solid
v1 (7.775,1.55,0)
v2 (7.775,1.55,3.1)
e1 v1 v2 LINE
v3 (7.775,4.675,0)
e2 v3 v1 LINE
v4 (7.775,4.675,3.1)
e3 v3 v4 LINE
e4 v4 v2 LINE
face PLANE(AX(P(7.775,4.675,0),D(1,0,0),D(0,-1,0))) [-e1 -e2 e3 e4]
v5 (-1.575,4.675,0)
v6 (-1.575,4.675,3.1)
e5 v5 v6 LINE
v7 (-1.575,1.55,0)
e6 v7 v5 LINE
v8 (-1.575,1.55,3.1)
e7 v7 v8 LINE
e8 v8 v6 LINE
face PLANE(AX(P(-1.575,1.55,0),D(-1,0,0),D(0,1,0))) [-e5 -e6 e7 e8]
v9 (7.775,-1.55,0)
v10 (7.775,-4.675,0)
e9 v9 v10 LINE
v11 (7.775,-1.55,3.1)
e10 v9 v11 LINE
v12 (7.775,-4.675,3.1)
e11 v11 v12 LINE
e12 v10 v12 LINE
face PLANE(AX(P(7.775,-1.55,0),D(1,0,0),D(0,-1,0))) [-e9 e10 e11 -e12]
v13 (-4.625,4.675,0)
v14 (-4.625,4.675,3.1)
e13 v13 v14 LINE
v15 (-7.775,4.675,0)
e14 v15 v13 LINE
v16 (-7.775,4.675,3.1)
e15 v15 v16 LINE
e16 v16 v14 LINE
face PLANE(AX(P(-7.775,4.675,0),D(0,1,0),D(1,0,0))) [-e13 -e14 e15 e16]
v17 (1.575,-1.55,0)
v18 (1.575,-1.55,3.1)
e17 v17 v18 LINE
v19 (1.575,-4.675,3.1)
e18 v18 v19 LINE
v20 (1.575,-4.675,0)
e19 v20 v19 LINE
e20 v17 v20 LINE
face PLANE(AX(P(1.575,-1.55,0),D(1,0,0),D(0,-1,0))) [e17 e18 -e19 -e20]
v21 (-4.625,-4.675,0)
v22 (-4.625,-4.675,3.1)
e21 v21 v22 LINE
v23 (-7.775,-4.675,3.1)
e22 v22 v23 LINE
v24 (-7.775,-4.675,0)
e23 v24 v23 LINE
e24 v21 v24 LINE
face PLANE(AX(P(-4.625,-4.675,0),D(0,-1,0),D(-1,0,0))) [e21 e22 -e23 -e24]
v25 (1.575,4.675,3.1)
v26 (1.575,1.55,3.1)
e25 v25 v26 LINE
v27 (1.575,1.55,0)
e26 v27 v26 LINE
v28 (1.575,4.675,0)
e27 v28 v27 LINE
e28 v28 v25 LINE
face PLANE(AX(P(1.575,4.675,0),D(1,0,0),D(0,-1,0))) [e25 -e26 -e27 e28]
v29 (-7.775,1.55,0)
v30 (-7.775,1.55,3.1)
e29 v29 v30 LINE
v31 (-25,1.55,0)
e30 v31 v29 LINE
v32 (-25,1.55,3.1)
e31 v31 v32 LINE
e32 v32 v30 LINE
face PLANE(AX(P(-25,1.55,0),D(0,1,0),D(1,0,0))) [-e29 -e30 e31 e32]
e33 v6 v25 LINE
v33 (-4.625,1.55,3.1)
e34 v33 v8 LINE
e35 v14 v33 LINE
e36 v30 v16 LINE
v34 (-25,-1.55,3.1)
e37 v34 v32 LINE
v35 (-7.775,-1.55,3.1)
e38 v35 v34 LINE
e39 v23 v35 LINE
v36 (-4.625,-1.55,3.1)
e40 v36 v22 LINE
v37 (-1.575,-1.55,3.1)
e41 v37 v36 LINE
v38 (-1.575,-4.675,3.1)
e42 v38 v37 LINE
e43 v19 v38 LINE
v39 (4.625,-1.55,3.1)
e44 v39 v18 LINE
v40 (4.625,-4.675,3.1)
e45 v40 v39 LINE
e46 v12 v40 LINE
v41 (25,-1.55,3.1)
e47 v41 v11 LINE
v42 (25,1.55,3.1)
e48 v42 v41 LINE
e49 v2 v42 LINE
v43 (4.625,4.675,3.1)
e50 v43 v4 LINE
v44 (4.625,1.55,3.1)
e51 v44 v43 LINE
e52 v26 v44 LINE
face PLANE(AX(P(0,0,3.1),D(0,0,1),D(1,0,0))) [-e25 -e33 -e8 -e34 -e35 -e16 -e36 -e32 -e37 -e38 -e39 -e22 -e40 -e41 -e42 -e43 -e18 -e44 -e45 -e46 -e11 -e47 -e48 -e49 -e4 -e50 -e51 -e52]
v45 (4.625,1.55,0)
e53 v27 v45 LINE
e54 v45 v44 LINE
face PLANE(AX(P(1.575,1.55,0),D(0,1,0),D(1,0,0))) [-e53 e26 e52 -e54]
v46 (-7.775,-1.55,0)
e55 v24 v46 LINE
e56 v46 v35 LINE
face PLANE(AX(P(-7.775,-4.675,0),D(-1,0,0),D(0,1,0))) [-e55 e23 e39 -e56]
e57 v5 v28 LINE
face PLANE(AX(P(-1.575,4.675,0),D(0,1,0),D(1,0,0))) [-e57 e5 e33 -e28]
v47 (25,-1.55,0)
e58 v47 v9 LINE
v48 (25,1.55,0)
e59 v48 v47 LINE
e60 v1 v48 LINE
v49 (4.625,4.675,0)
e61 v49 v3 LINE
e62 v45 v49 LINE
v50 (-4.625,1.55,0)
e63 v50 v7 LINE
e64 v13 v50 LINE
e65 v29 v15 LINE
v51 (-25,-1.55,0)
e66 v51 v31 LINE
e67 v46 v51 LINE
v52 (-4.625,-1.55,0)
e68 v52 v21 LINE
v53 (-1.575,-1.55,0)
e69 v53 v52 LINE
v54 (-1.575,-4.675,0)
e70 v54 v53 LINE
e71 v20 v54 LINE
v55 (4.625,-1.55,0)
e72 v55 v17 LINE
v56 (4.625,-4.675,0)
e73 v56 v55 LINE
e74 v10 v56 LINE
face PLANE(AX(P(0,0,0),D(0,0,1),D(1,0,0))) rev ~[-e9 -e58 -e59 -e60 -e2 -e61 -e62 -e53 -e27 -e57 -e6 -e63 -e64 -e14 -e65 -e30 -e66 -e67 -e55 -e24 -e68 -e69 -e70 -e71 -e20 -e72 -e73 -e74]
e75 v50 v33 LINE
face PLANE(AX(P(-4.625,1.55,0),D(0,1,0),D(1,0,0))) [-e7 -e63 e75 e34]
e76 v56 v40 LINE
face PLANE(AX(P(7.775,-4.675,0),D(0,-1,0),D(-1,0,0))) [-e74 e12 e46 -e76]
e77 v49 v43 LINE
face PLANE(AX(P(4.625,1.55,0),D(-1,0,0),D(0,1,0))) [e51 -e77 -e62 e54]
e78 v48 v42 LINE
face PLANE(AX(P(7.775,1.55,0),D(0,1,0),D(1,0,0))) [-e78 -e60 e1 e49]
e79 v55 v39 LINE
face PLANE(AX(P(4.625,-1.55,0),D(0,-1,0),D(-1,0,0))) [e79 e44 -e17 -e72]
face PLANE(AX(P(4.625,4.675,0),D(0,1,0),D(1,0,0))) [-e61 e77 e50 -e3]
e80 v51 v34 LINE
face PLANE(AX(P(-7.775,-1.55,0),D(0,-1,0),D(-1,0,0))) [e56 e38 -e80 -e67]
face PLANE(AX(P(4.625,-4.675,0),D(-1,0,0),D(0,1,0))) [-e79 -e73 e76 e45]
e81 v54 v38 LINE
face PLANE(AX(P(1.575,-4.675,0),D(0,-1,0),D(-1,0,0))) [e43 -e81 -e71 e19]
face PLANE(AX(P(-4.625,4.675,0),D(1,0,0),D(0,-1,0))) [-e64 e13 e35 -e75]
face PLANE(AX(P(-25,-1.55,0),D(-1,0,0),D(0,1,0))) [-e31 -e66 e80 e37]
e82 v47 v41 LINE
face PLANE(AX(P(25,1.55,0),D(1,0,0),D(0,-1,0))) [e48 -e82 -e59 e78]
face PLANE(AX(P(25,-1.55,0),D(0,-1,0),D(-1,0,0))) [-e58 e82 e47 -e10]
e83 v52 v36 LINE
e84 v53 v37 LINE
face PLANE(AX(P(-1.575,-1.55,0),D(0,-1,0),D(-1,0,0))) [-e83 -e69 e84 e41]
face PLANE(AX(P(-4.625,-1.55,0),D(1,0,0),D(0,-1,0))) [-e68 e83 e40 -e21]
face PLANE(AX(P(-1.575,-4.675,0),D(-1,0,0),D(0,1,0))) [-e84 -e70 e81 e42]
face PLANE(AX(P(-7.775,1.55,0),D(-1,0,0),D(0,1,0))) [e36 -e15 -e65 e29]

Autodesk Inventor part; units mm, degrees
ref_plane "YZ Plane" through (0, 0, 0) normal (1, 0, 0) x (0, 1, 0)
ref_plane "XZ Plane" through (0, 0, 0) normal (0, 1, 0) x (-1, 0, 0)
ref_plane "XY Plane" through (0, 0, 0) normal (0, 0, 1) x (1, 0, 0)
sketch "tabs" plane through (0, 0, 0) normal (0, 0, 1) x (1, 0, 0)
  line L0 (15.6175, 13.9118) -> (18.7675, 13.9118)
  line L1 (18.7675, 13.9118) -> (18.7675, 10.7868)
  line L2 (18.7675, 10.7868) -> (15.6175, 10.7868)
  line L3 (15.6175, 10.7868) -> (15.6175, 13.9118)
  line L4 (21.8175, 13.9118) -> (24.9675, 13.9118)
  line L5 (24.9675, 13.9118) -> (24.9675, 10.7868)
  line L6 (24.9675, 10.7868) -> (21.8175, 10.7868)
  line L7 (21.8175, 10.7868) -> (21.8175, 13.9118)
  line L8 (28.0175, 13.9118) -> (31.1675, 13.9118)
  line L9 (31.1675, 13.9118) -> (31.1675, 10.7868)
  line L10 (31.1675, 10.7868) -> (28.0175, 10.7868)
  line L11 (28.0175, 10.7868) -> (28.0175, 13.9118)
  line L12 (23.3925, 10.7868) -> (23.3925, 8.8536) construction
  point P0 (23.3925, 12.1901)
  dimension "d2" = 3.15
  dimension "d3" = 3.05
  dimension "d4" = 3.05
  dimension "d5" = 3.125
sketch "Sketch1" plane through (0, 0, 0) normal (0, 0, 1) x (1, 0, 0)
  line L0 (-25, 1.55) -> (25, 1.55)
  line L1 (25, 1.55) -> (25, -1.55)
  line L2 (25, -1.55) -> (-25, -1.55)
  line L3 (-25, -1.55) -> (-25, 1.55)
  line L4 (0, 16.9043) -> (0, -20.0235) construction
  line L5 (-32.3473, 0) -> (40.4078, 0) construction
  line L6 (-7.775, 4.675) -> (-4.625, 4.675)
  line L7 (-4.625, 4.675) -> (-4.625, 1.55)
  line L8 (-4.625, 1.55) -> (-7.775, 1.55)
  line L9 (-7.775, 1.55) -> (-7.775, 4.675)
  line L10 (-1.575, 4.675) -> (1.575, 4.675)
  line L11 (1.575, 4.675) -> (1.575, 1.55)
  line L12 (1.575, 1.55) -> (-1.575, 1.55)
  line L13 (-1.575, 1.55) -> (-1.575, 4.675)
  line L14 (4.625, 4.675) -> (7.775, 4.675)
  line L15 (7.775, 4.675) -> (7.775, 1.55)
  line L16 (7.775, 1.55) -> (4.625, 1.55)
  line L17 (4.625, 1.55) -> (4.625, 4.675)
  line L18 (0, 1.55) -> (0, -0.3832) construction
  line L19 (-7.775, -1.55) -> (-4.625, -1.55)
  line L20 (-4.625, -1.55) -> (-4.625, -4.675)
  line L21 (-4.625, -4.675) -> (-7.775, -4.675)
  line L22 (-7.775, -4.675) -> (-7.775, -1.55)
  line L23 (-1.575, -1.55) -> (1.575, -1.55)
  line L24 (1.575, -1.55) -> (1.575, -4.675)
  line L25 (1.575, -4.675) -> (-1.575, -4.675)
  line L26 (-1.575, -4.675) -> (-1.575, -1.55)
  line L27 (4.625, -1.55) -> (7.775, -1.55)
  line L28 (7.775, -1.55) -> (7.775, -4.675)
  line L29 (7.775, -4.675) -> (4.625, -4.675)
  line L30 (4.625, -4.675) -> (4.625, -1.55)
  line L31 (0, -4.675) -> (0, -6.6082) construction
  point P0 (0, 0)
  point P1 (25, 0)
  dimension "d0" = 50
  dimension "d1" = 3.1
extrude "Extrusion1" add sketch "Sketch1" along normal blind 3.1
equation "\"d2\" = mat + kerf"
equation "\"d3\" = mat - kerf"
equation "\"d4\" = mat - kerf"
equation "\"d5\" = mat + 0.5 * kerf"
equation "\"d1\" = mat"
equation "\"d6\" = mat"
equation "\"mat\" = 3.1"
equation "\"kerf\" = 0.05"
properties part number "link1"
